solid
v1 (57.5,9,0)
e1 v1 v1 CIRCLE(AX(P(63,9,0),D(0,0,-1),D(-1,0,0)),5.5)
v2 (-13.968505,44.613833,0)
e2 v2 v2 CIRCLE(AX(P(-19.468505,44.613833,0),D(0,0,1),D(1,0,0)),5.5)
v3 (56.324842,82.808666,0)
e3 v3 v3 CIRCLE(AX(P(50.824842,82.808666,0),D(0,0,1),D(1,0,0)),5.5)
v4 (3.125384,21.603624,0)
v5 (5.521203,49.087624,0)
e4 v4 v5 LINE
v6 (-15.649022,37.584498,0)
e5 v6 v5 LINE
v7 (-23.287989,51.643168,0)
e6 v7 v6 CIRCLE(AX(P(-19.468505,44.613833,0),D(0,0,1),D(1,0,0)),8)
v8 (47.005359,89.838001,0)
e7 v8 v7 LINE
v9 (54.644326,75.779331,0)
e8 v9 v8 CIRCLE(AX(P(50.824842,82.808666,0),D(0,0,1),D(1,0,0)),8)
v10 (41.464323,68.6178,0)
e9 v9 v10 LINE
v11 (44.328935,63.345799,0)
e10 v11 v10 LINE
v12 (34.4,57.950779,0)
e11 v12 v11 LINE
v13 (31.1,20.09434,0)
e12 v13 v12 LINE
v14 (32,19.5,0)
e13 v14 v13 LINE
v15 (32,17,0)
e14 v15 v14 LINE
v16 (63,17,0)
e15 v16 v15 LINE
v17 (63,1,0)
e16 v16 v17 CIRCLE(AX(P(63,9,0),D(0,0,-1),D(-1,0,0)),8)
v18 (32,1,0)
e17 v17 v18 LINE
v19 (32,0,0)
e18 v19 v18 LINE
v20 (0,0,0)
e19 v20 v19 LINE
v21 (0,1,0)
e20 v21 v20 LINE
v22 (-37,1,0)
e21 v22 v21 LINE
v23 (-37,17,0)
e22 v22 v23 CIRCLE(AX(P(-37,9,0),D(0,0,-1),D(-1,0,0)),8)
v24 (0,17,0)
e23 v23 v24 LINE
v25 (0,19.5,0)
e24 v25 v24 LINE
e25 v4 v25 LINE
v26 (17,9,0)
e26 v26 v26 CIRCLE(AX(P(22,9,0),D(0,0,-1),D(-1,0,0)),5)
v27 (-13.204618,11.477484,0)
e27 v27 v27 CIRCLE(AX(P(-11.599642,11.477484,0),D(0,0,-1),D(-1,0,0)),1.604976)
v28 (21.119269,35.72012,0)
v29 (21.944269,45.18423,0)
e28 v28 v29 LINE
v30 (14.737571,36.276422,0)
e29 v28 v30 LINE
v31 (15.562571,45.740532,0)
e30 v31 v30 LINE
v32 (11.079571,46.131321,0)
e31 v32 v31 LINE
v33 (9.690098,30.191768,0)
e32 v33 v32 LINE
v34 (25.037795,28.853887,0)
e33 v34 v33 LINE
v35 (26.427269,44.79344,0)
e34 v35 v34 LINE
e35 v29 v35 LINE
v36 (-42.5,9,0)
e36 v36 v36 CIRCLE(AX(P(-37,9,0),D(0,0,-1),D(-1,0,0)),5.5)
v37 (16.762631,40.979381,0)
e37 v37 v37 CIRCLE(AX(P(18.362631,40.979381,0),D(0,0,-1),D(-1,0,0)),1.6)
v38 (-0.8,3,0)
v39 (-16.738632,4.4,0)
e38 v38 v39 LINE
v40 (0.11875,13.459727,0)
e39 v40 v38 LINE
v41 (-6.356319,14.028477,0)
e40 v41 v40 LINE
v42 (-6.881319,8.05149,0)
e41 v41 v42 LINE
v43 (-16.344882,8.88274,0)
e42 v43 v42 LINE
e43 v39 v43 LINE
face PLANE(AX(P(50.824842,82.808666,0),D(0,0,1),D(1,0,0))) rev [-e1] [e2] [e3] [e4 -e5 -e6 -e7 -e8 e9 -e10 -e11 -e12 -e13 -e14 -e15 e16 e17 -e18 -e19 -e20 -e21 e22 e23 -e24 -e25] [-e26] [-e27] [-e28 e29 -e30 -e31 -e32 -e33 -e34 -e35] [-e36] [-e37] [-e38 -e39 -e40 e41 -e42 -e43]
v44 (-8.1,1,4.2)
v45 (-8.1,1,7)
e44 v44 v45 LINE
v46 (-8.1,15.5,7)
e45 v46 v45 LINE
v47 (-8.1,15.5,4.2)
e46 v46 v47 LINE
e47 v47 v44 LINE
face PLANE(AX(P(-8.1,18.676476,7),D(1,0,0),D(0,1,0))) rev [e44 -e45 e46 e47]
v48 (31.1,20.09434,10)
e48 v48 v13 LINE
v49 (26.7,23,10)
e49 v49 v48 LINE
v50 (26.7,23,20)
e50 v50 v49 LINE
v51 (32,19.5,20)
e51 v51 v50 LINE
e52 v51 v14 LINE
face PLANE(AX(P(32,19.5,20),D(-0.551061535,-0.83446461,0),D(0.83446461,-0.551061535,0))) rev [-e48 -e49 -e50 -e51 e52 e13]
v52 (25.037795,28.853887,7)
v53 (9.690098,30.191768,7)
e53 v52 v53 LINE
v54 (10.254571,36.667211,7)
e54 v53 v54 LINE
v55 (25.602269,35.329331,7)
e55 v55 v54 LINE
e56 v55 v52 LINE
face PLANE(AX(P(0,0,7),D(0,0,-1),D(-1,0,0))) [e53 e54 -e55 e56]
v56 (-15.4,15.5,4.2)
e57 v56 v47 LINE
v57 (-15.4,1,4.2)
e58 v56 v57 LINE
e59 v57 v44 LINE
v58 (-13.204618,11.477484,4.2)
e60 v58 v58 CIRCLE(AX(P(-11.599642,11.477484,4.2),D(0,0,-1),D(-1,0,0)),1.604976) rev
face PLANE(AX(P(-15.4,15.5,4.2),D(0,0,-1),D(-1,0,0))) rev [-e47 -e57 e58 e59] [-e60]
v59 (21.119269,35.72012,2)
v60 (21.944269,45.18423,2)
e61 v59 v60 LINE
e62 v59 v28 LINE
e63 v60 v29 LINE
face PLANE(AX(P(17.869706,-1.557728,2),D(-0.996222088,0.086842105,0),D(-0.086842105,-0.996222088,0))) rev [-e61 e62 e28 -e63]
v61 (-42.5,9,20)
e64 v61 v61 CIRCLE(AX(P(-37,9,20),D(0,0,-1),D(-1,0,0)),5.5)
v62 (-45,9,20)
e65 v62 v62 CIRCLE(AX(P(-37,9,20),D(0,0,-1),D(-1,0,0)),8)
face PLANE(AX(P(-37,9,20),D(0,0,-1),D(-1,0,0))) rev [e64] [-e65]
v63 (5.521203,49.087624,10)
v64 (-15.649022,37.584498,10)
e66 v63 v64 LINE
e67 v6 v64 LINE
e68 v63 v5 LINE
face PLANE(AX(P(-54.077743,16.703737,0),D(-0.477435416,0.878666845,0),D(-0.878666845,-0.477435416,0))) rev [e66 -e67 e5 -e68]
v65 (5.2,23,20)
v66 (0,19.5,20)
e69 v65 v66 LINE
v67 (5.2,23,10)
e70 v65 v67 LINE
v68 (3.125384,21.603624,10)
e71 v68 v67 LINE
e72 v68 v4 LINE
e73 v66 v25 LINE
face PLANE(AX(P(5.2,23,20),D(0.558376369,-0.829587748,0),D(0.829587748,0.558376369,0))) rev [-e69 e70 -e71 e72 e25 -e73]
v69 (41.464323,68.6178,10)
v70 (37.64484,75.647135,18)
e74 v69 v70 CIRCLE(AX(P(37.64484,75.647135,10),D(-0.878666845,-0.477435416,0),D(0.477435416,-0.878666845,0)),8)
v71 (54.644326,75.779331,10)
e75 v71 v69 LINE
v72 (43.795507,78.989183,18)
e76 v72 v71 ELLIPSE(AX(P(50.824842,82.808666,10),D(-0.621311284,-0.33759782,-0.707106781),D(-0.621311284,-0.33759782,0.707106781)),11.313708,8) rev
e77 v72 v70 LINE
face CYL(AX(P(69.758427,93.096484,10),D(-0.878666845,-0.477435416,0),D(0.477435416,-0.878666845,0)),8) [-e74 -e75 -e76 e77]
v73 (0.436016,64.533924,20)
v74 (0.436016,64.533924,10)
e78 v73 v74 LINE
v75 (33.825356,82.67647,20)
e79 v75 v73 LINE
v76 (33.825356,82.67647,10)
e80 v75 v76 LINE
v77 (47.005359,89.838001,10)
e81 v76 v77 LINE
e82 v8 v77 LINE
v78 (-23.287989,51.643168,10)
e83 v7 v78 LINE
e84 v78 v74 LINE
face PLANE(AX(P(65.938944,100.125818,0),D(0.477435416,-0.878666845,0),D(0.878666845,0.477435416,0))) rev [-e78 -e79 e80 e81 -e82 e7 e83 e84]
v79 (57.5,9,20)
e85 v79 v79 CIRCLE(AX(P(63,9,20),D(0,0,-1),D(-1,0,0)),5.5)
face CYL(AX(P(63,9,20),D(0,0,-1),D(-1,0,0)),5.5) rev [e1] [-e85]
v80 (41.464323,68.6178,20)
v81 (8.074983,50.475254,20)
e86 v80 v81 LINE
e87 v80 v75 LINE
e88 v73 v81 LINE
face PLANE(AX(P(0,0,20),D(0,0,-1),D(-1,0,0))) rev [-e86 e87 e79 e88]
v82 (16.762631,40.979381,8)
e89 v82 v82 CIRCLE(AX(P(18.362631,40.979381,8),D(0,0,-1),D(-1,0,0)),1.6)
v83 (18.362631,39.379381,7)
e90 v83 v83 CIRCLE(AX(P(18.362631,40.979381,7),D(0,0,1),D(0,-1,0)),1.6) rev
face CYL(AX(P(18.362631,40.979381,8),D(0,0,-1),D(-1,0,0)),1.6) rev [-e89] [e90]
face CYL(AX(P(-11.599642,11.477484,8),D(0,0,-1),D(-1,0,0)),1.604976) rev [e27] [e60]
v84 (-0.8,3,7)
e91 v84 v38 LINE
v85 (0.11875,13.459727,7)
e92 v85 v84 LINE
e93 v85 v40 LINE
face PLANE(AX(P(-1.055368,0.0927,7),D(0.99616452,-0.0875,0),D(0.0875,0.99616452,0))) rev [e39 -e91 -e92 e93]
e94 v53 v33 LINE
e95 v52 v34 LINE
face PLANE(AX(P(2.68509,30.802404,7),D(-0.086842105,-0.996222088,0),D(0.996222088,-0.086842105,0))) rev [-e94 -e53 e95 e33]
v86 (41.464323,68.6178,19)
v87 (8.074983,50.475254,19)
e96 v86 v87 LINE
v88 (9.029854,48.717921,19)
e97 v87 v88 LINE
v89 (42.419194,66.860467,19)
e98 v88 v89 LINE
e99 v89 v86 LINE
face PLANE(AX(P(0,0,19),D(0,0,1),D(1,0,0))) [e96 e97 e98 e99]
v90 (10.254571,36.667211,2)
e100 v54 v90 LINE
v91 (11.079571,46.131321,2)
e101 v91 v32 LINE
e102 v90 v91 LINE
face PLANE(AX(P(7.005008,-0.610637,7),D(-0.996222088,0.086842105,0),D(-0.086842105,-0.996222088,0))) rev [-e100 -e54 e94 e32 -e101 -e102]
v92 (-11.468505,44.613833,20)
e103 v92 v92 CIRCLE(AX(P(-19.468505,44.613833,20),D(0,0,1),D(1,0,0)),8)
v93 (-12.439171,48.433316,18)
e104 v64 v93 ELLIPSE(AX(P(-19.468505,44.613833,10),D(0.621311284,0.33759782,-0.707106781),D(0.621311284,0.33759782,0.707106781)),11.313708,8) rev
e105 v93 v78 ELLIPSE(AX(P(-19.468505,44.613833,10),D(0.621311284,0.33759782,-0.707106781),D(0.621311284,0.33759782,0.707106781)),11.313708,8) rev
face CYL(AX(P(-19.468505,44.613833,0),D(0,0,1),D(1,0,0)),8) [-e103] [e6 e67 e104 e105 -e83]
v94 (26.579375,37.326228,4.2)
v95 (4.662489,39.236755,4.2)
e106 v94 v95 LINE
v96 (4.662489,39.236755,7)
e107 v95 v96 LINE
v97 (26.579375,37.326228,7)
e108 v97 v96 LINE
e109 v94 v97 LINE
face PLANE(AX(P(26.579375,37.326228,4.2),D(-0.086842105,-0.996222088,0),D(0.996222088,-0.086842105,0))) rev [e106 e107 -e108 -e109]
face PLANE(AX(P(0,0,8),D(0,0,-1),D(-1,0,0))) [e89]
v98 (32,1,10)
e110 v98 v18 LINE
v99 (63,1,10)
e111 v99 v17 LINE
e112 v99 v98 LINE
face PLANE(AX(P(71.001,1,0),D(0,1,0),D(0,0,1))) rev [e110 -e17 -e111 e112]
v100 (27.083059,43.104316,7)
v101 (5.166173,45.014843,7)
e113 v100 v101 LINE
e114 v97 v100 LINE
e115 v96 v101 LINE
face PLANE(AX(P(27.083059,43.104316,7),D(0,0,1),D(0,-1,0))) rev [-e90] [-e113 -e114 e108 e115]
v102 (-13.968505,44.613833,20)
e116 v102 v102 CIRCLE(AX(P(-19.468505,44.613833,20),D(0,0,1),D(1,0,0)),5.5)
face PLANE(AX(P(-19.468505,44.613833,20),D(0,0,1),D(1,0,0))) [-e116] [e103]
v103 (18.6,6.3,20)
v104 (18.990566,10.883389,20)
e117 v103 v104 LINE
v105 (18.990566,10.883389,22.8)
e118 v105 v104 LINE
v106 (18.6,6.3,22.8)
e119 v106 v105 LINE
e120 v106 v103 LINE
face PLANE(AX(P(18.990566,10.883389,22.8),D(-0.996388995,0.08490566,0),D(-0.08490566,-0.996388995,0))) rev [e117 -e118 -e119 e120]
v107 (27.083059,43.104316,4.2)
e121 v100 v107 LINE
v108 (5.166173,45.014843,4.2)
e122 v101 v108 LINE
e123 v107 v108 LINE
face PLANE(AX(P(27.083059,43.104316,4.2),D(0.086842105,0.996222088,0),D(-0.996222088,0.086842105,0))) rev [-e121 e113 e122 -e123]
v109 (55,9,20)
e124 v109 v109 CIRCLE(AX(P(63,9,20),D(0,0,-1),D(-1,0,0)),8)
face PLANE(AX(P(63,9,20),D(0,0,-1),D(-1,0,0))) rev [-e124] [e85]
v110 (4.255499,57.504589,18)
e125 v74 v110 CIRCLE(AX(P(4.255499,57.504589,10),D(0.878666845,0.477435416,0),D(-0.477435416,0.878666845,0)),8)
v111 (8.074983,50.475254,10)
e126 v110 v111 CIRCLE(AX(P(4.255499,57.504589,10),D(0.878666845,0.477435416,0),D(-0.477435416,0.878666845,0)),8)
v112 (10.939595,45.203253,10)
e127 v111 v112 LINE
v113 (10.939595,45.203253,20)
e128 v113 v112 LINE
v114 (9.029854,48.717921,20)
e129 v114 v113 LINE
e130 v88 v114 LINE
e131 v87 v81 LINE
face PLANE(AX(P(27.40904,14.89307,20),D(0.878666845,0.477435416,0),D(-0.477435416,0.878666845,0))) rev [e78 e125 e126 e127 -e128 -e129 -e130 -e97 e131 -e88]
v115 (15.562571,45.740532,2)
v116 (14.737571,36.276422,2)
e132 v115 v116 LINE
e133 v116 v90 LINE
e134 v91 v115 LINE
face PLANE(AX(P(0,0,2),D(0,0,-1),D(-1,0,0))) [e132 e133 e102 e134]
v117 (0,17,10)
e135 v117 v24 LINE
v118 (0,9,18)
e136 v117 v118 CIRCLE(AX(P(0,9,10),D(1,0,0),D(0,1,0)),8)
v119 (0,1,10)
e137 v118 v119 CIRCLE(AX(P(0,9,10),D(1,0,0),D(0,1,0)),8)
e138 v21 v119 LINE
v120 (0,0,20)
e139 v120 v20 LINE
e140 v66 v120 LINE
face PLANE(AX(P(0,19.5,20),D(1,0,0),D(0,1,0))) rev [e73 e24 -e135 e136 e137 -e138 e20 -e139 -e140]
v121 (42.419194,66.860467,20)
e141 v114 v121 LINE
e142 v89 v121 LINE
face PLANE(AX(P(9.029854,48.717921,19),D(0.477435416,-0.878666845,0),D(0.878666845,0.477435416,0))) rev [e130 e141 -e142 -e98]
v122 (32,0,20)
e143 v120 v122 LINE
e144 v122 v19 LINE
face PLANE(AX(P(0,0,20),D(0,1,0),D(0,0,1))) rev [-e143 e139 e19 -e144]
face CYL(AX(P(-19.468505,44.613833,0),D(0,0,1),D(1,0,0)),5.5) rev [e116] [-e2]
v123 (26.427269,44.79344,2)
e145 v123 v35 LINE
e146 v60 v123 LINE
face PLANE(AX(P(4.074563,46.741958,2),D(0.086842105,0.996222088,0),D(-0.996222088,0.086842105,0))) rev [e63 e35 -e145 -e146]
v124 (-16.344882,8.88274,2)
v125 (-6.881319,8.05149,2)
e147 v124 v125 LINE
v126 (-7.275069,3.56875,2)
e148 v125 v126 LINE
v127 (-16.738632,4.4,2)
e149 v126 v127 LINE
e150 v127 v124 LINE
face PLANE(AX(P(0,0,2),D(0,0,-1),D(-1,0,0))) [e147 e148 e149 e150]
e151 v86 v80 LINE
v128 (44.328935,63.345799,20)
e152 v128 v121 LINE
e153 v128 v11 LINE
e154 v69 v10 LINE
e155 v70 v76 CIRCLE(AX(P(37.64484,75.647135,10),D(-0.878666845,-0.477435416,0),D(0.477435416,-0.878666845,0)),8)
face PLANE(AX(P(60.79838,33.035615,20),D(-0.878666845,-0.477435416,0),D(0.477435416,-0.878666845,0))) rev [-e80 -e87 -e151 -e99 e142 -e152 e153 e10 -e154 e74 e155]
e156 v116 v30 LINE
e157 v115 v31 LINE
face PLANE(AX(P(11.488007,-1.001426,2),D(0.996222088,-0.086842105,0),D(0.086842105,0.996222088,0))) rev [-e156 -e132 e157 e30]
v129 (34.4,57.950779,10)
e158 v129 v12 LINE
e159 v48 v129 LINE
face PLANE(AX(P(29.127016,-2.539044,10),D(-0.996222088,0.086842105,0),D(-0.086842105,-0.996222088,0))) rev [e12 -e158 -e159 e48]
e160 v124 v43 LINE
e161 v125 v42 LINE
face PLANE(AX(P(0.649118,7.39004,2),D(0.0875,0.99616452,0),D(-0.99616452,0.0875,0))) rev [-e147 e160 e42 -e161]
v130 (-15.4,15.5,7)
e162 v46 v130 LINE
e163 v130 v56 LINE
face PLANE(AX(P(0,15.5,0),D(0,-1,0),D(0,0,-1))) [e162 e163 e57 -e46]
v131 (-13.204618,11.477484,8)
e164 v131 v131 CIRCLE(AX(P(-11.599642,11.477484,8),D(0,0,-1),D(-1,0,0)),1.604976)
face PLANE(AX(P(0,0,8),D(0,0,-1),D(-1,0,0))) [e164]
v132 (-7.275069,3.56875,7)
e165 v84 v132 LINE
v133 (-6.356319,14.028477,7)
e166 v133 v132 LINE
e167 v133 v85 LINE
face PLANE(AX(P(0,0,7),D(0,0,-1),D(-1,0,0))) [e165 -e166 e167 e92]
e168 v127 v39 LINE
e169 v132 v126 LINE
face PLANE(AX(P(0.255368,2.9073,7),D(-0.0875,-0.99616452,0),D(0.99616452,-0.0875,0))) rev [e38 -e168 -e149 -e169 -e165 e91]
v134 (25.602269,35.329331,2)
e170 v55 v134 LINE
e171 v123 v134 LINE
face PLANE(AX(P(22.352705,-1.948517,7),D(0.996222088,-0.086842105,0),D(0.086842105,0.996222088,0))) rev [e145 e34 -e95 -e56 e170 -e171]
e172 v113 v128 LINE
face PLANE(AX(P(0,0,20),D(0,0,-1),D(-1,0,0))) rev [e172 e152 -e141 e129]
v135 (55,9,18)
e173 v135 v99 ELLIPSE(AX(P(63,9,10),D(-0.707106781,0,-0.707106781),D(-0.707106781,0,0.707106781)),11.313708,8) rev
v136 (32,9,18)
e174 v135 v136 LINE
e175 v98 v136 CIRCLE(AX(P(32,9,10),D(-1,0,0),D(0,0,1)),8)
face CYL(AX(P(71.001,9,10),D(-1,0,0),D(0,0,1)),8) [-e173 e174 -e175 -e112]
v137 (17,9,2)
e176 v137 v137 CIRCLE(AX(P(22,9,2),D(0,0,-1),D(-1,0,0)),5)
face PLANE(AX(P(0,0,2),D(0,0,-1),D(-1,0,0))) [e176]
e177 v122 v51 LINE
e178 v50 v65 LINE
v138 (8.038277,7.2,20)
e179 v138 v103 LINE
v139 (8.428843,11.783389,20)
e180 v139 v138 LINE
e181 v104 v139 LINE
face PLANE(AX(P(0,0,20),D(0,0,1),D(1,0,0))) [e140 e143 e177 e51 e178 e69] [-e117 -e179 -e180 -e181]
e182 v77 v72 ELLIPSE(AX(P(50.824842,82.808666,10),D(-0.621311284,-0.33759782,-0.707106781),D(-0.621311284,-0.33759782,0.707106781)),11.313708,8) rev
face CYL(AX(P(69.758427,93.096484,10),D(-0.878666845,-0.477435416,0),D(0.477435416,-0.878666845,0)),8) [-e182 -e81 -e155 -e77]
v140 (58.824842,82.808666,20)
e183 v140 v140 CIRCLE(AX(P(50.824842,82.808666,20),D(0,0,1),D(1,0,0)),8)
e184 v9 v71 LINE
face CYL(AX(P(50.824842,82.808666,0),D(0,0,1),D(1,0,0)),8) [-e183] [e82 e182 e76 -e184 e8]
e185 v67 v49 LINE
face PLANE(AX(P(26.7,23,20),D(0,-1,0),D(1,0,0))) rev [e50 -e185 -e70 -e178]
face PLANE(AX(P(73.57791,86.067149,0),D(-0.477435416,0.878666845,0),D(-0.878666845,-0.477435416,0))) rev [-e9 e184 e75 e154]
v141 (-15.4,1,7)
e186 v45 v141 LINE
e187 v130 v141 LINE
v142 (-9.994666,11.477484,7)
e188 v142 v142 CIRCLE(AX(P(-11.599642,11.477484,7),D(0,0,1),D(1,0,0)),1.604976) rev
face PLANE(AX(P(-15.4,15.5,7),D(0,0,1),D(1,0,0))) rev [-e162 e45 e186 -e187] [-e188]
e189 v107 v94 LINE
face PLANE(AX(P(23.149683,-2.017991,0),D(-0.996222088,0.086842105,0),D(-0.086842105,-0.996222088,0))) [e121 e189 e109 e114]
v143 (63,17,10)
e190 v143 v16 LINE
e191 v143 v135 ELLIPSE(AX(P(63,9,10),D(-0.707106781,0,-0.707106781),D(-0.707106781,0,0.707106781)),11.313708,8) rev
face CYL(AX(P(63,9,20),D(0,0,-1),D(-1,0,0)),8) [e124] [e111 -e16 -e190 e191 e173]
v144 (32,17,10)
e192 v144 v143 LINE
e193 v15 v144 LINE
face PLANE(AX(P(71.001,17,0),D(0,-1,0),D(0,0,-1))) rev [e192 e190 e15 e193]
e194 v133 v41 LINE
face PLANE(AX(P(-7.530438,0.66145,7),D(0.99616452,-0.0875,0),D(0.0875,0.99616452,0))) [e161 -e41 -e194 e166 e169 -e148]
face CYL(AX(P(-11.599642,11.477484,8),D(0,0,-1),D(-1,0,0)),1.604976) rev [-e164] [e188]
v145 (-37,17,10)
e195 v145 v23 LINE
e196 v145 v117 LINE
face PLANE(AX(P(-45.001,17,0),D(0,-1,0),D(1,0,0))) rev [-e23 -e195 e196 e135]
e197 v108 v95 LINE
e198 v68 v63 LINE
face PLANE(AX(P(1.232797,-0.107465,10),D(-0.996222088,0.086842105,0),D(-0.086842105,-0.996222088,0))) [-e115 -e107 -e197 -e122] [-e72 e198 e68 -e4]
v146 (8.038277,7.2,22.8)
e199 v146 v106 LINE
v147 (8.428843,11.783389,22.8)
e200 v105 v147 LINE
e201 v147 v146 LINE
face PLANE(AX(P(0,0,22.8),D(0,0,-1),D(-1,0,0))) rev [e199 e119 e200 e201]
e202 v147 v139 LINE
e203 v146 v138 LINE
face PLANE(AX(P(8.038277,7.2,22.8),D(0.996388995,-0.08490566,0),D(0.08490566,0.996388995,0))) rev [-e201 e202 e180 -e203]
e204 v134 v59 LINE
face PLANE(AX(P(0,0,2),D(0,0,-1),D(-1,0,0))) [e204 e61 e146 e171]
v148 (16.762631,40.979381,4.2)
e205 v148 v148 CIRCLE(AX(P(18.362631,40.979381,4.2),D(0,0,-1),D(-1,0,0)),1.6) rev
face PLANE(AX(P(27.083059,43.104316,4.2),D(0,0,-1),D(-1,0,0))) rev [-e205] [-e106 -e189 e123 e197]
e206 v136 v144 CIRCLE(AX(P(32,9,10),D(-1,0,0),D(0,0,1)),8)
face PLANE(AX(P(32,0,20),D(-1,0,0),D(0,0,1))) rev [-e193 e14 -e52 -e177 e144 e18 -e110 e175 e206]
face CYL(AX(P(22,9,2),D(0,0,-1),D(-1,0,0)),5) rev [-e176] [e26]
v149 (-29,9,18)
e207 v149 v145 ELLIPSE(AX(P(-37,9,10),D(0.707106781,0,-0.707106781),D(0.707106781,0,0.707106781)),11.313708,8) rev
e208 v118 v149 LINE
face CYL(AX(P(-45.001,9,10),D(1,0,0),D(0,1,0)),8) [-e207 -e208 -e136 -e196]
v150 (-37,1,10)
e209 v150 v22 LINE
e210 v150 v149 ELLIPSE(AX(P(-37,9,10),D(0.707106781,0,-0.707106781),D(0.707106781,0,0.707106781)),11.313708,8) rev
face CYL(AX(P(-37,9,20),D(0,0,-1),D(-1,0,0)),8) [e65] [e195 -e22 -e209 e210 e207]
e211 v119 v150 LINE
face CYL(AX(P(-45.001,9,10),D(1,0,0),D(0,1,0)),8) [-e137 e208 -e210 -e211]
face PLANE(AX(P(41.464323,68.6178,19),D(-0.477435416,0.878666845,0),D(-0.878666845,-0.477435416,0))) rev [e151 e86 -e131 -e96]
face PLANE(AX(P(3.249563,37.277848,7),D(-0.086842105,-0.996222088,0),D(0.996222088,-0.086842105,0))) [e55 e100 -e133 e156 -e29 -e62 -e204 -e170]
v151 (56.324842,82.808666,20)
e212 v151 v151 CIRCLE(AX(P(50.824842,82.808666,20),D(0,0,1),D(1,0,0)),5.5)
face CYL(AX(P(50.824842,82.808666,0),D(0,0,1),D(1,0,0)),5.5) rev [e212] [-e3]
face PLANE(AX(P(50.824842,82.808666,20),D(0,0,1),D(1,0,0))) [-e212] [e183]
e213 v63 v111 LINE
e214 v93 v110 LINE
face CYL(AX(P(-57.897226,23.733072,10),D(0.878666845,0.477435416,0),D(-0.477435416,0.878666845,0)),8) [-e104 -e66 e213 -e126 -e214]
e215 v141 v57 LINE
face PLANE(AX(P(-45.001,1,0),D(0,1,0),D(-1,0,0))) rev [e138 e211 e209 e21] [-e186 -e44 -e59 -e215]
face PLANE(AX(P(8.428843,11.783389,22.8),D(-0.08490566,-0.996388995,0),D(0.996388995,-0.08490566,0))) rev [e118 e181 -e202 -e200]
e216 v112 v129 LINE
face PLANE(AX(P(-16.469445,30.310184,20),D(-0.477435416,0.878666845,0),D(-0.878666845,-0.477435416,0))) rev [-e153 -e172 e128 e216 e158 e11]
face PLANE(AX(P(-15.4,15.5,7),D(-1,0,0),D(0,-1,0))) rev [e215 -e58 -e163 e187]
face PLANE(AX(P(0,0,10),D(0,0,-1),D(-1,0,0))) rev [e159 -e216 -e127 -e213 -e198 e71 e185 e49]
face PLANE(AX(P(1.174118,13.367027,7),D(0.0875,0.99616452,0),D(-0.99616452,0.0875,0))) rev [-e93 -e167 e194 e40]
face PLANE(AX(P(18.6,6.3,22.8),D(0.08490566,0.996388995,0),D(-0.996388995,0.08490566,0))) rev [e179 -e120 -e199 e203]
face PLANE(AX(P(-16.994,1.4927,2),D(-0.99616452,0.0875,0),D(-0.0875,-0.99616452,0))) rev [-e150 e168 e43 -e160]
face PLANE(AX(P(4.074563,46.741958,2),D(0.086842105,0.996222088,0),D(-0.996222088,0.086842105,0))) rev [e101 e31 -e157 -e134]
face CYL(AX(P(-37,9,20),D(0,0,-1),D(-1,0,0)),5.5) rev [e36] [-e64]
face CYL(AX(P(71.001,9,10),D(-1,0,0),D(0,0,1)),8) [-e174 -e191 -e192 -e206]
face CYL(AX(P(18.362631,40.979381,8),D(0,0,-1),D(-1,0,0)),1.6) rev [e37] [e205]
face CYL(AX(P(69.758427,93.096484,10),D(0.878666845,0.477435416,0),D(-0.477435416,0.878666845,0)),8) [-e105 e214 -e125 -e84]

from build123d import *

# Parameters (mm, degrees)
BOSS_EXTRUDE1_DEPTH      = 20
SKETCH2_R                = 8.000000000000012
SKETCH2_R_2              = 5.5000000000000036
BOSS_EXTRUDE2_DEPTH      = 20
SKETCH2_R_3              = 7.999999999999998
SKETCH2_R_4              = 5.4999999999999964
BOSS_EXTRUDE2_2_DEPTH    = 20
BOSS_EXTRUDE3_REACH      = 84.813
BOSS_EXTRUDE3_END_RADIUS = 8.000000000000012
BOSS_EXTRUDE4_REACH      = 79.266
BOSS_EXTRUDE4_END_RADIUS = 7.999999999999998
BOSS_EXTRUDE5_DEPTH      = 10
BOSS_EXTRUDE6_DEPTH      = 20
SKETCH7_R                = 8
SKETCH7_R_2              = 5.499999999999997
BOSS_EXTRUDE7_DEPTH      = 20
SKETCH7_R_3              = 8.000000000000002
SKETCH7_R_4              = 5.500000000000001
BOSS_EXTRUDE7_2_DEPTH    = 20
BOSS_EXTRUDE8_REACH      = 108.8
BOSS_EXTRUDE8_END_RADIUS = 8.000000000000002
BOSS_EXTRUDE9_REACH      = 124.193
BOSS_EXTRUDE9_END_RADIUS = 8
FILLET1_R                = 8
CUT_EXTRUDE1_DEPTH       = 1
BOSS_EXTRUDE10_DEPTH     = 2.8000000000000003
SKETCH12_R               = 5.000000000000001
CUT_EXTRUDE2_DEPTH       = 2
CUT_EXTRUDE3_DEPTH       = 6.999999999999999
CUT_EXTRUDE4_DEPTH       = 2
SKETCH12_7_R             = 1.6049758304520296
SKETCH12_7_R_2           = 1.6000000000000008
CUT_EXTRUDE5_DEPTH       = 8
SKETCH13_W               = 2.8000000000000007
SKETCH13_H               = 5.799999999999997
CUT_EXTRUDE6_DEPTH       = 22.000000000000004
CUT_EXTRUDE7_DEPTH       = 14.499999999999998
CUT_EXTRUDE8_DEPTH       = 14.5


with BuildPart() as part:
    # Sketch1 → Boss-Extrude1 (new body)
    with BuildSketch(Plane.XY):
        Polygon((0, 0), (32, 0), (32, 19.5), (26.699999999999996, 23), (5.2, 22.999999999999996), (-9e-17, 19.5), align=None)
    extrude(amount=BOSS_EXTRUDE1_DEPTH)



with BuildPart() as body_2:
    # Sketch2 → Boss-Extrude2 (new body)
    with BuildSketch(Plane(origin=(0, 0, 0), x_dir=(-1, 0, 0), z_dir=(0, 0, -1))):
        with Locations((-63, 8.999999999999982)):
            Circle(SKETCH2_R)
        with Locations((-63, 8.999999999999982)):
            Circle(SKETCH2_R_2, mode=Mode.SUBTRACT)
    extrude(amount=-BOSS_EXTRUDE2_DEPTH)


with BuildPart() as body_3:
    # Sketch2 → Boss-Extrude2 2 (new body)
    with BuildSketch(Plane(origin=(0, 0, 0), x_dir=(-1, 0, 0), z_dir=(0, 0, -1))):
        with Locations((37.00000000000001, 9.000000000000002)):
            Circle(SKETCH2_R_3)
        with Locations((37.00000000000001, 9.000000000000002)):
            Circle(SKETCH2_R_4, mode=Mode.SUBTRACT)
    extrude(amount=-BOSS_EXTRUDE2_2_DEPTH)


with BuildPart() as part_1:
    add(part.part)

    add(body_2.part)  # Boss-Extrude3 merges body 2
    # Boss-Extrude3: up to this cylinder (the profile starts outside it)
    boss_extrude3_end = Plane(origin=(63, 8.999999999999982, 9), z_dir=(0, 0, -1)) * Cylinder(BOSS_EXTRUDE3_END_RADIUS, 186.62600000000003, mode=Mode.PRIVATE)
    # Sketch4 → Boss-Extrude3 (add, up to the surface)
    with BuildSketch(Plane(origin=(32, 0, 0), x_dir=(0, 0, -1), z_dir=(1, 0, 0)), mode=Mode.PRIVATE) as boss_extrude3_sk1:
        Polygon((0, 17), (-18.000000000000004, 16.999999999999996), (-18, 0.9999999999999974), (2.03e-15, 0.9999999999999996), align=None)
    boss_extrude3_tool1 = extrude(boss_extrude3_sk1.sketch, amount=BOSS_EXTRUDE3_REACH, mode=Mode.PRIVATE) - boss_extrude3_end
    add(boss_extrude3_tool1.solids().sort_by_distance((32, 9, 9))[0])


    add(body_3.part)  # Boss-Extrude4 merges body 3
    # Boss-Extrude4: up to this cylinder (the profile starts outside it)
    boss_extrude4_end = Plane(origin=(-37.00000000000001, 9.000000000000002, 9), z_dir=(0, 0, -1)) * Cylinder(BOSS_EXTRUDE4_END_RADIUS, 175.532, mode=Mode.PRIVATE)
    # Sketch5 → Boss-Extrude4 (add, up to the surface)
    with BuildSketch(Plane.ZY, mode=Mode.PRIVATE) as boss_extrude4_sk1:
        Polygon((0, 17), (18.000000000000004, 17), (18.000000000000007, 1.0000000000000009), (1.96e-15, 1.0000000000000009), align=None)
    boss_extrude4_tool1 = extrude(boss_extrude4_sk1.sketch, amount=BOSS_EXTRUDE4_REACH, mode=Mode.PRIVATE) - boss_extrude4_end
    add(boss_extrude4_tool1.solids().sort_by_distance((0, 9, 9))[0])

    # Sketch6 → Boss-Extrude5 (add)
    with BuildSketch(Plane(origin=(0, 0, 0), x_dir=(-1, 0, 0), z_dir=(0, 0, -1))):
        Polygon((-34.39999999999999, 57.95077896920448), (-31.099999999999998, 20.09433962264151), (-26.699999999999996, 23), (-5.2, 22.999999999999996), (-3.1253837694695172, 21.603623690989096), (-5.978502136601586, 54.33359411944373), (-10.939595247933246, 45.203253371300974), align=None)
    extrude(amount=-BOSS_EXTRUDE5_DEPTH)

    # Sketch6<3> → Boss-Extrude6 (add)
    with BuildSketch(Plane(origin=(0, 0, 0), x_dir=(-1, 0, 0), z_dir=(0, 0, -1))):
        Polygon((-0.4360161035932989, 64.53392395352827), (-10.939595247933246, 45.203253371300974), (-44.328935344507634, 63.34579916606999), (-33.82535620016769, 82.67646974829727), align=None)
    extrude(amount=-BOSS_EXTRUDE6_DEPTH)



with BuildPart() as body_2_2:
    # Sketch7 → Boss-Extrude7 (new body)
    with BuildSketch(Plane.XY.offset(20)):
        with Locations((50.82484219508264, 82.80866622590094)):
            Circle(SKETCH7_R)
        with Locations((50.82484219508264, 82.80866622590094)):
            Circle(SKETCH7_R_2, mode=Mode.SUBTRACT)
    extrude(amount=-BOSS_EXTRUDE7_DEPTH)


with BuildPart() as body_3_2:
    # Sketch7 → Boss-Extrude7 2 (new body)
    with BuildSketch(Plane.XY.offset(20)):
        with Locations((-19.46850537665293, 44.613832973755706)):
            Circle(SKETCH7_R_3)
        with Locations((-19.46850537665293, 44.613832973755706)):
            Circle(SKETCH7_R_4, mode=Mode.SUBTRACT)
    extrude(amount=-BOSS_EXTRUDE7_2_DEPTH)


with BuildPart() as part_2:
    add(part_1.part)

    add(body_3_2.part)  # Boss-Extrude8 merges body 3 2
    # Boss-Extrude8: up to this cylinder (the profile starts outside it)
    boss_extrude8_end = Plane(origin=(-19.46850537665293, 44.613832973755706, 9), z_dir=(0, 0, 1)) * Cylinder(BOSS_EXTRUDE8_END_RADIUS, 234.6, mode=Mode.PRIVATE)
    # Sketch8 → Boss-Extrude8 (add, up to the surface)
    with BuildSketch(Plane(origin=(27.409040149935237, 14.89306960462748, 0), x_dir=(0, 0, 1), z_dir=(-0.8786668446466945, -0.47743541565181535, 0)), mode=Mode.PRIVATE) as boss_extrude8_sk1:
        Polygon((0, 56.49564980326649), (18.000000000000004, 56.49564980326649), (18.000000000000007, 40.49564980326649), (1.65e-15, 40.49564980326649), align=None)
    boss_extrude8_tool1 = extrude(boss_extrude8_sk1.sketch, amount=BOSS_EXTRUDE8_REACH, mode=Mode.PRIVATE) - boss_extrude8_end
    add(boss_extrude8_tool1.solids().sort_by_distance((4.255499, 57.504589, 9))[0])


    add(body_2_2.part)  # Boss-Extrude9 merges body 2 2
    # Boss-Extrude9: up to this cylinder (the profile starts outside it)
    boss_extrude9_end = Plane(origin=(50.82484219508264, 82.80866622590094, 9), z_dir=(0, 0, 1)) * Cylinder(BOSS_EXTRUDE9_END_RADIUS, 265.38599999999997, mode=Mode.PRIVATE)
    # Sketch9 → Boss-Extrude9 (add, up to the surface)
    with BuildSketch(Plane(origin=(60.79838024650963, 33.03561539939651, 0), x_dir=(0, 0, -1), z_dir=(0.8786668446466942, 0.47743541565181585, 0)), mode=Mode.PRIVATE) as boss_extrude9_sk1:
        Polygon((0, 56.49564980326643), (-18.000000000000004, 56.49564980326643), (-18, 40.49564980326643), (1.96e-15, 40.49564980326643), align=None)
    boss_extrude9_tool1 = extrude(boss_extrude9_sk1.sketch, amount=BOSS_EXTRUDE9_REACH, mode=Mode.PRIVATE) - boss_extrude9_end
    add(boss_extrude9_tool1.solids().sort_by_distance((37.64484, 75.647135, 9))[0])

    # Fillet1
    # the kernel refuses this fillet: 8 mm, written as the material it takes off along each edge
    with BuildSketch(Plane(origin=(32, 0.9999999999999974, 18), x_dir=(0, 1e-16, -1), z_dir=(1, 0, 0))) as fillet1_piece_1_section:
        with BuildLine():
            CenterArc((FILLET1_R, FILLET1_R), FILLET1_R, 180, 90)
            Line((7.8e-16, FILLET1_R), (0, 0))
            Line((0, 0), (FILLET1_R, 0))
        make_face()
    fillet1_piece_1 = extrude(amount=51, mode=Mode.PRIVATE)
    fillet1_piece_1 = fillet1_piece_1 - Plane(origin=(63, 8.999999999999982, 16.146124278615087), x_dir=(-1, 0, 0), z_dir=(0, 0, -1)) * Cylinder(8.000000000000012, 134, mode=Mode.PRIVATE)
    add(fillet1_piece_1, mode=Mode.SUBTRACT)
    with BuildSketch(Plane(origin=(32, 16.999999999999996, 18.000000000000004), x_dir=(0, 0, -1), z_dir=(1, 0, 0))) as fillet1_piece_2_section:
        with BuildLine():
            CenterArc((FILLET1_R, -FILLET1_R), FILLET1_R, 90.00000000000001, 89.99999999999999)
            Line((3.55e-15, -FILLET1_R), (0, 0))
            Line((0, 0), (FILLET1_R, 0))
        make_face()
    fillet1_piece_2 = extrude(amount=51, mode=Mode.PRIVATE)
    fillet1_piece_2 = fillet1_piece_2 - Plane(origin=(63, 8.999999999999982, 16.146124278615446), x_dir=(-1, 0, 0), z_dir=(0, 0, -1)) * Cylinder(8.000000000000012, 134, mode=Mode.PRIVATE)
    add(fillet1_piece_2, mode=Mode.SUBTRACT)
    with BuildSketch(Plane(origin=(41.464322850596744, 68.61780023395015, 18), x_dir=(0, 0, -1), z_dir=(0.8786668446466942, 0.47743541565181585, 0))) as fillet1_piece_3_section:
        with BuildLine():
            CenterArc((FILLET1_R, FILLET1_R), FILLET1_R, 180.00000000000009, 89.99999999999989)
            Line((-3.55e-15, FILLET1_R), (0, 0))
            Line((0, 0), (FILLET1_R, 0))
        make_face()
    fillet1_piece_3 = extrude(amount=35, mode=Mode.PRIVATE)
    fillet1_piece_3 = fillet1_piece_3 - Plane(origin=(50.82484219508264, 82.80866622590094, 16.04484502768724), x_dir=(1, 0, 0), z_dir=(0, 0, 1)) * Cylinder(8, 102, mode=Mode.PRIVATE)
    add(fillet1_piece_3, mode=Mode.SUBTRACT)
    with BuildSketch(Plane(origin=(33.82535620016769, 82.67646974829725, 18.000000000000004), x_dir=(0.47743541565181585, -0.8786668446466942, 0), z_dir=(0.8786668446466942, 0.47743541565181585, 0))) as fillet1_piece_4_section:
        with BuildLine():
            CenterArc((FILLET1_R, FILLET1_R), FILLET1_R, 180, 90)
            Line((6.95e-15, FILLET1_R), (0, 0))
            Line((0, 0), (FILLET1_R, 0))
        make_face()
    fillet1_piece_4 = extrude(amount=35.00000000000005, mode=Mode.PRIVATE)
    fillet1_piece_4 = fillet1_piece_4 - Plane(origin=(50.82484219508264, 82.80866622590094, 16.044845027687604), x_dir=(1, 0, 0), z_dir=(0, 0, 1)) * Cylinder(8, 103, mode=Mode.PRIVATE)
    add(fillet1_piece_4, mode=Mode.SUBTRACT)
    with BuildSketch(Plane(origin=(0.4360161035932997, 64.5339239535283, 18.000000000000004), x_dir=(1.28e-15, -2.35e-15, -1), z_dir=(-0.8786668446466945, -0.47743541565181535, 0))) as fillet1_piece_5_section:
        with BuildLine():
            CenterArc((FILLET1_R, FILLET1_R), FILLET1_R, 180, 89.99999999999983)
            Line((1.784e-14, FILLET1_R), (0, 0))
            Line((0, 0), (FILLET1_R, 0))
        make_face()
    fillet1_piece_5 = extrude(amount=47.00000000000002, mode=Mode.PRIVATE)
    fillet1_piece_5 = fillet1_piece_5 - Plane(origin=(-19.46850537665293, 44.613832973755706, 16.13426416613262), x_dir=(1, 0, 0), z_dir=(0, 0, 1)) * Cylinder(8.000000000000002, 127, mode=Mode.PRIVATE)
    add(fillet1_piece_5, mode=Mode.SUBTRACT)
    with BuildSketch(Plane(origin=(8.074982754022347, 50.47525443918118, 18.000000000000007), x_dir=(-0.47743541565181535, 0.8786668446466944, 0), z_dir=(-0.8786668446466945, -0.47743541565181535, 0))) as fillet1_piece_6_section:
        with BuildLine():
            CenterArc((FILLET1_R, FILLET1_R), FILLET1_R, 180, 90)
            Line((-7.94e-15, FILLET1_R), (0, 0))
            Line((0, 0), (FILLET1_R, 0))
        make_face()
    fillet1_piece_6 = extrude(amount=47.00000000000002, mode=Mode.PRIVATE)
    fillet1_piece_6 = fillet1_piece_6 - Plane(origin=(-19.46850537665293, 44.613832973755706, 15.757082069038027), x_dir=(1, 0, 0), z_dir=(0, 0, 1)) * Cylinder(8.000000000000002, 127, mode=Mode.PRIVATE)
    add(fillet1_piece_6, mode=Mode.SUBTRACT)
    with BuildSketch(Plane(origin=(0, 1.0000000000000009, 18.000000000000007), x_dir=(0, -1.1e-16, -1), z_dir=(-1, 0, 0))) as fillet1_piece_7_section:
        with BuildLine():
            CenterArc((FILLET1_R, -FILLET1_R), FILLET1_R, 90, 90)
            Line((-8.9e-16, -FILLET1_R), (0, 0))
            Line((0, 0), (FILLET1_R, 0))
        make_face()
    fillet1_piece_7 = extrude(amount=57.00000000000002, mode=Mode.PRIVATE)
    fillet1_piece_7 = fillet1_piece_7 - Plane(origin=(-37.00000000000001, 9.000000000000002, 16.158452965658498), x_dir=(-1, 0, 0), z_dir=(0, 0, -1)) * Cylinder(7.999999999999998, 147, mode=Mode.PRIVATE)
    add(fillet1_piece_7, mode=Mode.SUBTRACT)
    with BuildSketch(Plane(origin=(-8e-17, 17, 18.000000000000004), x_dir=(0, 0, -1), z_dir=(-1, 0, 0))) as fillet1_piece_8_section:
        with BuildLine():
            CenterArc((FILLET1_R, FILLET1_R), FILLET1_R, 180.00000000000003, 90)
            Line((-3.55e-15, FILLET1_R), (0, 0))
            Line((0, 0), (FILLET1_R, 0))
        make_face()
    fillet1_piece_8 = extrude(amount=57.00000000000001, mode=Mode.PRIVATE)
    fillet1_piece_8 = fillet1_piece_8 - Plane(origin=(-37.00000000000001, 9.000000000000002, 16.1584529656595), x_dir=(-1, 0, 0), z_dir=(0, 0, -1)) * Cylinder(7.999999999999998, 146, mode=Mode.PRIVATE)
    add(fillet1_piece_8, mode=Mode.SUBTRACT)

    # Sketch10 → Cut-Extrude1 (cut)
    with BuildSketch(Plane.XY.offset(20)):
        Polygon((9.02985358532597, 48.71792074988778), (42.41919368190036, 66.86046654465682), (41.46432285059673, 68.6178002339502), (8.074982754022338, 50.47525443918117), align=None)
    extrude(amount=-CUT_EXTRUDE1_DEPTH, mode=Mode.SUBTRACT)

    # Sketch11 → Boss-Extrude10 (add)
    with BuildSketch(Plane.XY.offset(20)):
        Polygon((18.99056603773585, 10.883389375796833), (18.599999999999998, 6.3), (8.038276655772503, 7.2), (8.428842693508352, 11.78338937579684), align=None)
    extrude(amount=BOSS_EXTRUDE10_DEPTH)

    # Sketch12 → Cut-Extrude2 (cut)
    with BuildSketch(Plane(origin=(0, 0, 0), x_dir=(-1, 0, 0), z_dir=(0, 0, -1))):
        with Locations((-22, 9.000000000000002)):
            Circle(SKETCH12_R)
    extrude(amount=-CUT_EXTRUDE2_DEPTH, mode=Mode.SUBTRACT)

    # Sketch12<4> → Cut-Extrude3 (cut)
    with BuildSketch(Plane(origin=(0, 0, 0), x_dir=(-1, 0, 0), z_dir=(0, 0, -1))):
        Polygon((6.356319377041451, 14.028477455220814), (-0.11875000000000302, 13.459727455220813), (0.800000000000002, 3.0000000000000018), (7.275069377041458, 3.568750000000003), (6.8813193770414545, 8.051490337951781), align=None)
        Polygon((-25.602268748509772, 35.32933063302242), (-25.037795064299242, 28.85388706058404), (-9.69009760065465, 30.191767814935158), (-10.254571284865174, 36.66721138737354), (-14.737570681168684, 36.27642191368933), (-21.119269352206267, 35.72012010670664), align=None)
    extrude(amount=-CUT_EXTRUDE3_DEPTH, mode=Mode.SUBTRACT)

    # Sketch12<6> → Cut-Extrude4 (cut)
    with BuildSketch(Plane(origin=(0, 0, 0), x_dir=(-1, 0, 0), z_dir=(0, 0, -1))):
        Polygon((6.8813193770414545, 8.051490337951781), (7.275069377041457, 3.5687500000000023), (16.73863231271742, 4.400000000000003), (16.34488231271742, 8.882740337951782), align=None)
        Polygon((-14.737570681168684, 36.27642191368933), (-10.254571284865174, 36.66721138737354), (-11.079571284865175, 46.13132122401429), (-15.562570681168683, 45.740531750330085), align=None)
        Polygon((-26.427268748509782, 44.79344046966318), (-25.602268748509772, 35.32933063302242), (-21.119269352206267, 35.72012010670663), (-21.944269352206273, 45.18422994334738), align=None)
    extrude(amount=-CUT_EXTRUDE4_DEPTH, mode=Mode.SUBTRACT)

    # Sketch12<7> → Cut-Extrude5 (cut)
    with BuildSketch(Plane(origin=(0, 0, 0), x_dir=(-1, 0, 0), z_dir=(0, 0, -1))):
        with Locations((11.59964197476565, 11.4774838965863)):
            Circle(SKETCH12_7_R)
        with Locations((-18.362630543003274, 40.979381450535236)):
            Circle(SKETCH12_7_R_2)
    extrude(amount=-CUT_EXTRUDE5_DEPTH, mode=Mode.SUBTRACT)

    # Sketch13 → Cut-Extrude6 (cut)
    with BuildSketch(Plane(origin=(1.232797121271193, -0.10746468950636484, 0), x_dir=(0, 0, 1), z_dir=(-0.9962220880674463, 0.0868421052631576, 0))):
        with Locations((5.6000000000000005, 42.39342200955655)):
            Rectangle(SKETCH13_W, SKETCH13_H)
    extrude(amount=-CUT_EXTRUDE6_DEPTH, mode=Mode.SUBTRACT)

    # Sketch14 → Cut-Extrude7 (cut)
    with BuildSketch(Plane.XZ.offset(-1.0000000000000009)):
        Polygon((-15.399999999999999, 7), (-9.600000000000001, 7), (-9.6, 4.2), (-15.399999999999999, 4.2), align=None)
    extrude(amount=-CUT_EXTRUDE7_DEPTH, mode=Mode.SUBTRACT)

    # Sketch15 → Cut-Extrude8 (cut)
    with BuildSketch(Plane.XZ.offset(-1.0000000000000009)):
        Polygon((-9.600000000000001, 7), (-8.100000000000001, 7), (-8.100000000000001, 4.2), (-9.6, 4.2), align=None)
    extrude(amount=-CUT_EXTRUDE8_DEPTH, mode=Mode.SUBTRACT)


solid = part_2.part
